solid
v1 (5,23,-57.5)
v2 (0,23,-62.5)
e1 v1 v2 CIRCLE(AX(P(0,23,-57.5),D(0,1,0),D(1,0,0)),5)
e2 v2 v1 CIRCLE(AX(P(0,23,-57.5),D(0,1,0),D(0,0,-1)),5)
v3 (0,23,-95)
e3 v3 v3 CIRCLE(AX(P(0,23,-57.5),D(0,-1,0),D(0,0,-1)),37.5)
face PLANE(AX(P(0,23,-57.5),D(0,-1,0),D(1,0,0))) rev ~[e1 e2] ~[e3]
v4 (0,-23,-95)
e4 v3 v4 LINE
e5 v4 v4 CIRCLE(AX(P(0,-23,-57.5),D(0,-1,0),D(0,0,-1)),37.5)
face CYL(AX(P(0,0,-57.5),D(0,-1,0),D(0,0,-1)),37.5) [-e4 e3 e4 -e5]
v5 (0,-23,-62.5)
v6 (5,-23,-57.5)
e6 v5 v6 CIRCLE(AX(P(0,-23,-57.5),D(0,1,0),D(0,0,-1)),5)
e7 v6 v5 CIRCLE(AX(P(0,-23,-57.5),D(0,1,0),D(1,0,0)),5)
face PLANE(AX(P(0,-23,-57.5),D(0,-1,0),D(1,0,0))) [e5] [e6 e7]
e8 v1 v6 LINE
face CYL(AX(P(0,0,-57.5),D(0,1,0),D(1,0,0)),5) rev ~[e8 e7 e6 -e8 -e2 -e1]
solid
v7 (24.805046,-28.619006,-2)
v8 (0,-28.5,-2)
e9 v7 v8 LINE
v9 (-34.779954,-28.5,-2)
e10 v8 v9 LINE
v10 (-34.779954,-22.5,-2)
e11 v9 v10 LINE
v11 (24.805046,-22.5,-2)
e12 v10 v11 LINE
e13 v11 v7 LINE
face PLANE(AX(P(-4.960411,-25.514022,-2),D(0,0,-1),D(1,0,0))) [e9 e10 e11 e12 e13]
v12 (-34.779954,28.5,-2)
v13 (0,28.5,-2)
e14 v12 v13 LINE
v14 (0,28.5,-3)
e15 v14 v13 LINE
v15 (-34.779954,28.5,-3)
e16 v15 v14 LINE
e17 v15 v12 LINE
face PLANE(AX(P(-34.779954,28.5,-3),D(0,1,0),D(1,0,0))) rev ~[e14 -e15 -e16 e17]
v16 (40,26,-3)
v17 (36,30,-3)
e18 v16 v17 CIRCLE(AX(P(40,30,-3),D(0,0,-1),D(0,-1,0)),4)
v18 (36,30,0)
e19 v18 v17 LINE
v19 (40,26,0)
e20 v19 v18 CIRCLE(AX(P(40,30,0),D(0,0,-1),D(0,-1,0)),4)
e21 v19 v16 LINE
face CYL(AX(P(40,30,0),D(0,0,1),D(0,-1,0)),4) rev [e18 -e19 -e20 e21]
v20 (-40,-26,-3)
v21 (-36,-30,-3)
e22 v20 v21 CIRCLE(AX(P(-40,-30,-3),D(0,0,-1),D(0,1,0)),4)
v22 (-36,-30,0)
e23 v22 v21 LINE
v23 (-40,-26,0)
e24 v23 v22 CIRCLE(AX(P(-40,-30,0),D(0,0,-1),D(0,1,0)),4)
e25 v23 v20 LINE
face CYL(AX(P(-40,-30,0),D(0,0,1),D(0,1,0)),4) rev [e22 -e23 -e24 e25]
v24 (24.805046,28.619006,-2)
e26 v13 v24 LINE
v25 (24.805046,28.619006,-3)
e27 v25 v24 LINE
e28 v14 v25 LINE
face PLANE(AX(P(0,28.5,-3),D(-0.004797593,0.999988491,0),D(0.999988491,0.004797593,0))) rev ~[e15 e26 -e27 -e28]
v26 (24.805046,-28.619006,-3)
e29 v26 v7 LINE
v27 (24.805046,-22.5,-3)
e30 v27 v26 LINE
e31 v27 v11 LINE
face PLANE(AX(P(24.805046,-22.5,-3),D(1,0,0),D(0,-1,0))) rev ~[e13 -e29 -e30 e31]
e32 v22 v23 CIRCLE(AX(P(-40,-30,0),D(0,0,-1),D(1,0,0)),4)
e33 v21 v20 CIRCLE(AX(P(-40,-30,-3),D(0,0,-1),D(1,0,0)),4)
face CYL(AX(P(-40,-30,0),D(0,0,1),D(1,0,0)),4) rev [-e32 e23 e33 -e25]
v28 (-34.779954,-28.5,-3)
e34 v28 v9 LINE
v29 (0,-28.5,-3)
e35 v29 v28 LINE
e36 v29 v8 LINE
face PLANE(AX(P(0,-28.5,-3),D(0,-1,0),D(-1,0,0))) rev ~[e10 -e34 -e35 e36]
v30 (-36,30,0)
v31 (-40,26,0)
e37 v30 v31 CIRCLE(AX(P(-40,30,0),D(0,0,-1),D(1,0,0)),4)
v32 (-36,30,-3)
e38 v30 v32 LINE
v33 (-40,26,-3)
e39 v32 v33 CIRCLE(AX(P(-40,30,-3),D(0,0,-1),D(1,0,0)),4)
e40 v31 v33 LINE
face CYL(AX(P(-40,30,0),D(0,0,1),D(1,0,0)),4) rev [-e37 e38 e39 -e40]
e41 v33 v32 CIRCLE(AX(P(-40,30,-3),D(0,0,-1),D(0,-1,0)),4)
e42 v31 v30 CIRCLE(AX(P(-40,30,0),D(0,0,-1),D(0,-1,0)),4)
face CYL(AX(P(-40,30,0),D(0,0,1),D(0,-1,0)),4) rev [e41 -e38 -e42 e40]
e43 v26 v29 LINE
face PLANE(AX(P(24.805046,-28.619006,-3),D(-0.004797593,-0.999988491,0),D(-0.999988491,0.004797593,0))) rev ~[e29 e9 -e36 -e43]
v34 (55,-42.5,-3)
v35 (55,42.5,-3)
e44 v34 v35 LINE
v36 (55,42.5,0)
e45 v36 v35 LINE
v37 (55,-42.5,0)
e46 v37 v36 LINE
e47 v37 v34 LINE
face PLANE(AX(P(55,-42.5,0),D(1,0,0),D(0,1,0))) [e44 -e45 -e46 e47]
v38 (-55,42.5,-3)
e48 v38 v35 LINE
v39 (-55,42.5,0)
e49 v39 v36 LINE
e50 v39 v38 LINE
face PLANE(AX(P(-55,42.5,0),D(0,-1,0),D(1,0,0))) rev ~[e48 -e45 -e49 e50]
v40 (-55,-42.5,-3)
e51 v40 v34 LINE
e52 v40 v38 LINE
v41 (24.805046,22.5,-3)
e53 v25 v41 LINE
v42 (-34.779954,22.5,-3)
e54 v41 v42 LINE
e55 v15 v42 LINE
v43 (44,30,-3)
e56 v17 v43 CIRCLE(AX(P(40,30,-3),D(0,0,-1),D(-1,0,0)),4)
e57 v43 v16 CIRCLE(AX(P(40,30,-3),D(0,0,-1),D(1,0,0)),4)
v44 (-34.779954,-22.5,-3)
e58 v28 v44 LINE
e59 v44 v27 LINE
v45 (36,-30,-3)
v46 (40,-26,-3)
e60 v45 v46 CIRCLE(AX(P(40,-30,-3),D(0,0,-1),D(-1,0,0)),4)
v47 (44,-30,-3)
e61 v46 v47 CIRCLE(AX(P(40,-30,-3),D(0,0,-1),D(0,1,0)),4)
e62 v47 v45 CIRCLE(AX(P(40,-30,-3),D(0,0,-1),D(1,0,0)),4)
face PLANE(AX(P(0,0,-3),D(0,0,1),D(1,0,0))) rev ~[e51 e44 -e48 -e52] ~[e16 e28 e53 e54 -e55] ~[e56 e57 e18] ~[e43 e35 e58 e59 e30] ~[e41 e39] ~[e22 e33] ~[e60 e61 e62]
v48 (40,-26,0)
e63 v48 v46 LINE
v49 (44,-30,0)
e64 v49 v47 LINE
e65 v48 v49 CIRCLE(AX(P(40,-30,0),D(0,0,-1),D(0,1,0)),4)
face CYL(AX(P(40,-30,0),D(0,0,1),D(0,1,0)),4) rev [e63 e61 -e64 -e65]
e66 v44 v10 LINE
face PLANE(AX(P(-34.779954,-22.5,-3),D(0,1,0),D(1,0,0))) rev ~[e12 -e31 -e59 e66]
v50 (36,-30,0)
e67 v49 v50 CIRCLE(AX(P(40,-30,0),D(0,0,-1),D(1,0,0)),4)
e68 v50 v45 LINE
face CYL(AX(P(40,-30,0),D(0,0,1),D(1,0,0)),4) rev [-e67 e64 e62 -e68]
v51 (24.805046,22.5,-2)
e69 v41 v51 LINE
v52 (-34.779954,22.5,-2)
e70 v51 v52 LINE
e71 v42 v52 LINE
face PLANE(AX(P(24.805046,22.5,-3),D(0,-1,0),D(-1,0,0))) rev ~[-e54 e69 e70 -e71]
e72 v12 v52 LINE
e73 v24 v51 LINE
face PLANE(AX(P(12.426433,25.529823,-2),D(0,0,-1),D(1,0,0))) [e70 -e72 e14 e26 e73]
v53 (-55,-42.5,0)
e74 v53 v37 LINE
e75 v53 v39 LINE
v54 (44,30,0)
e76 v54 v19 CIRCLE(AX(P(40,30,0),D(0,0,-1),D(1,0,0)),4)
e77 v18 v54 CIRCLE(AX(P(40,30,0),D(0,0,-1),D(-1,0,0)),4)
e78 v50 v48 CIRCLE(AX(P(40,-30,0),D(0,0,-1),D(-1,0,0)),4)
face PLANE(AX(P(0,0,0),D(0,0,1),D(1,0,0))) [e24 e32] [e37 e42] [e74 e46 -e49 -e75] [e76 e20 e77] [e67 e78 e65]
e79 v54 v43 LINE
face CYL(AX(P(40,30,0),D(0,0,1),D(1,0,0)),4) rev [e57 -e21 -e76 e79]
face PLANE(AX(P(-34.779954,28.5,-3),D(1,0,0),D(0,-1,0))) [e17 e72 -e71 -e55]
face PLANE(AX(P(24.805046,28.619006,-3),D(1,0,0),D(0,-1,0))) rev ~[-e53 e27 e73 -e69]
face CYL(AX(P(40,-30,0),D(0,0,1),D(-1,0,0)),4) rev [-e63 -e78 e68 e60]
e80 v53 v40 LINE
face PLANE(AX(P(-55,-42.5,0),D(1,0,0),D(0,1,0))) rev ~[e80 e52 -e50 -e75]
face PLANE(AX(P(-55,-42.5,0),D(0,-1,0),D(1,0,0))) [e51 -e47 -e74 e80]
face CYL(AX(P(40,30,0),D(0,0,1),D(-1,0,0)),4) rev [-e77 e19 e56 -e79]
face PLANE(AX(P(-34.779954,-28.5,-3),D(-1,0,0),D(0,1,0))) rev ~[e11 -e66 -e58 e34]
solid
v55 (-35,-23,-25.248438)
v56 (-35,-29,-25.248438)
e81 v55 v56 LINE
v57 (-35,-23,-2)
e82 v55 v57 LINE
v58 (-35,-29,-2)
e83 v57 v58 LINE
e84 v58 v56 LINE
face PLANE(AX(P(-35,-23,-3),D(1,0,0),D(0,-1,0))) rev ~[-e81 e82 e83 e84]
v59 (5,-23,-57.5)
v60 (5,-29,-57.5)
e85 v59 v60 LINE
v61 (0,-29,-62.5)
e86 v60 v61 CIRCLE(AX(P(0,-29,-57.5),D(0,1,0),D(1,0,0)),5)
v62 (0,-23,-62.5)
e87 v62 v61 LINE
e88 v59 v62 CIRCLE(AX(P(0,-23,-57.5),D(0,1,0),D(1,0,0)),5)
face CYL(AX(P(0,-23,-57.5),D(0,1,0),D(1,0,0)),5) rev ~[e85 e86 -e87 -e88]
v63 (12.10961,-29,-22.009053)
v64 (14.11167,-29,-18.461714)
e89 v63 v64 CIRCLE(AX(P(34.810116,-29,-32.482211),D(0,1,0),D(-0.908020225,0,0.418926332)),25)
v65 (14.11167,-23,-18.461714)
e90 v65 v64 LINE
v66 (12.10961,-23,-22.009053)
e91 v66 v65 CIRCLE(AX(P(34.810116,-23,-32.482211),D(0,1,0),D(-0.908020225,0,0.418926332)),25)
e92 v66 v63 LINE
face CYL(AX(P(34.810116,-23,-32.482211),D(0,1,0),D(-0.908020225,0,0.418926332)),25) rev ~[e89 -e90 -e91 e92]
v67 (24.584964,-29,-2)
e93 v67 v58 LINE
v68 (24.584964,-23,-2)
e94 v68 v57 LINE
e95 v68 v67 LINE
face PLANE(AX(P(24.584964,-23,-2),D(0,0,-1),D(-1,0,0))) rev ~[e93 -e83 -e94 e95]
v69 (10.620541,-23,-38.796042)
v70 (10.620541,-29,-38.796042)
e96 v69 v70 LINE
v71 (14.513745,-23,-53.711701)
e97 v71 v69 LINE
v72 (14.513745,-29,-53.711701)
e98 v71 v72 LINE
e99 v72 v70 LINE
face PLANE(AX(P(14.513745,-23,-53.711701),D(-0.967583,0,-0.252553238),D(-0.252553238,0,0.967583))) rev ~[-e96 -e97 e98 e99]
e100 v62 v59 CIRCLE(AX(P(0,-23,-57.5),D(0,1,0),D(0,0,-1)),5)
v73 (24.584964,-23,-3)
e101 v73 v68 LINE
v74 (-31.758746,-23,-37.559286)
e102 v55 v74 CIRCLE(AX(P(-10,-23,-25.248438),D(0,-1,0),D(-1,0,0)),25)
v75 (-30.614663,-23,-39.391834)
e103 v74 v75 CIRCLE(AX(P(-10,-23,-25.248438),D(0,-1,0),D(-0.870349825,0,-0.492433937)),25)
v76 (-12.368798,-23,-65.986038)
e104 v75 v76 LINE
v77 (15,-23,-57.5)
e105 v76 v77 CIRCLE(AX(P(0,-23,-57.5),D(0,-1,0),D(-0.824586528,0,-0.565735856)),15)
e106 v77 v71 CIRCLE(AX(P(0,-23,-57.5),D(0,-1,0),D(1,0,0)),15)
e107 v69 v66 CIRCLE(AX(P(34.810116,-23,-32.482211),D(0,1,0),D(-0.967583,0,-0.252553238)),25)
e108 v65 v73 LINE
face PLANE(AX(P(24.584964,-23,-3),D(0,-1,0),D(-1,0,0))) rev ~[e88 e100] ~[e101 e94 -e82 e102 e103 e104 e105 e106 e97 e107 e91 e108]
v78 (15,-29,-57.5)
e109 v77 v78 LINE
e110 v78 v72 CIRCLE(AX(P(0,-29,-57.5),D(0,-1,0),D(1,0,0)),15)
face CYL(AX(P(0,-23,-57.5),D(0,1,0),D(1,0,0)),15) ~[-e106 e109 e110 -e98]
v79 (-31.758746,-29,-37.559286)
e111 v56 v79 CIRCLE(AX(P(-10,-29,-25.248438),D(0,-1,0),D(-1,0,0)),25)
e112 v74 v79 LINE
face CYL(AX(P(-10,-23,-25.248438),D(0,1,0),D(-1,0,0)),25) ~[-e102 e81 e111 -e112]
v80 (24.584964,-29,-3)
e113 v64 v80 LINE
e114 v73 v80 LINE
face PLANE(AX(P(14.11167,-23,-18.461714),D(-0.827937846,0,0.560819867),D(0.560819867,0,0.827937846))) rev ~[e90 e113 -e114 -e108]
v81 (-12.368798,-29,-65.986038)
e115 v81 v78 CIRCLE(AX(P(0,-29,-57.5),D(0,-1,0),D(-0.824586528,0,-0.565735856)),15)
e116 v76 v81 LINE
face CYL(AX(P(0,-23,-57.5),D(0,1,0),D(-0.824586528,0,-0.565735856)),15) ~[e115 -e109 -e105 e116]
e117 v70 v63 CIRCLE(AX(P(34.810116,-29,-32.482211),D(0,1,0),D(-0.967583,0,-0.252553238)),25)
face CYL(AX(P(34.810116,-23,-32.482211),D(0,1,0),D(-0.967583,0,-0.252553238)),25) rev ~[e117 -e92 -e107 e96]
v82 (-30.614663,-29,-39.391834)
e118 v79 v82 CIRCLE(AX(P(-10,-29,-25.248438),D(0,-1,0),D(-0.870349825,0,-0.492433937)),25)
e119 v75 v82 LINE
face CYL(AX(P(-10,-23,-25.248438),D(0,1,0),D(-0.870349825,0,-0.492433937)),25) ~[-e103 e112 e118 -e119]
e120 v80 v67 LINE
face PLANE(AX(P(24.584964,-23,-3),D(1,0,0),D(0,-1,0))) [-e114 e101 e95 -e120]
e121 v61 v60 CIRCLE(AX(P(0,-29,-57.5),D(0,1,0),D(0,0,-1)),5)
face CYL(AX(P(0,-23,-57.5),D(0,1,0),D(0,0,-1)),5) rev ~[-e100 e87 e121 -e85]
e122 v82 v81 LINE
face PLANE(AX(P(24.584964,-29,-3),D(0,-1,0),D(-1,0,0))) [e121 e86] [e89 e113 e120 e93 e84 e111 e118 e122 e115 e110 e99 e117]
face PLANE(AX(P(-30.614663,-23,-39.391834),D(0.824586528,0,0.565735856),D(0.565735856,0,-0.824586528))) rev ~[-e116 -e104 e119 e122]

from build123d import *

# Parameters (mm, degrees)
F1_DEPTH = 23
F2_W     = 110
F2_H     = 85
F3_DEPTH = 3
F5_DEPTH = 6
F6_W     = 34.7799539885
F6_H     = 6
F7_DEPTH = 1
F8_DEPTH = 1


with BuildPart() as f1:
    # F0 (on Front) → F1 (new body, symmetric)
    with BuildSketch(Plane.XZ):
        with BuildLine():
            ThreePointArc((37.5, -57.5), (-26.5165042945, -30.9834957055), (0, -95))
            ThreePointArc((0, -95), (26.5165042945, -84.0165042945), (37.5, -57.5))
        make_face()
        with BuildLine():
            ThreePointArc((5, -57.5), (3.5355339059, -61.0355339059), (0, -62.5))
            ThreePointArc((0, -62.5), (-3.5355339059, -53.9644660941), (5, -57.5))
        make_face(mode=Mode.SUBTRACT)
    extrude(amount=F1_DEPTH, both=True)


with BuildPart() as f3:
    # F2 (on Top) → F3 (new body)
    with BuildSketch(Plane.XY):
        Rectangle(F2_W, F2_H)
        with BuildLine():
            Line((36, -30), (-36, -30))
            ThreePointArc((-36, -30), (-42.8284271247, -32.8284271247), (-40, -26))
            Line((-40, -26), (-40, 26))
            ThreePointArc((-40, 26), (-42.8284271247, 32.8284271247), (-36, 30))
            Line((-36, 30), (36, 30))
            ThreePointArc((36, 30), (40, 34), (44, 30))
            ThreePointArc((44, 30), (42.8284271247, 27.1715728753), (40, 26))
            Line((40, 26), (40, -26))
            ThreePointArc((40, -26), (42.8284271247, -27.1715728753), (44, -30))
            ThreePointArc((44, -30), (40, -34), (36, -30))
        make_face(mode=Mode.SUBTRACT)
        with BuildLine():
            ThreePointArc((-40, -26), (-37.1715728753, -27.1715728753), (-36, -30))
            Line((-36, -30), (36, -30))
            ThreePointArc((36, -30), (37.1715728753, -27.1715728753), (40, -26))
            Line((40, -26), (40, 26))
            ThreePointArc((40, 26), (37.1715728753, 27.1715728753), (36, 30))
            Line((36, 30), (-36, 30))
            ThreePointArc((-36, 30), (-37.1715728753, 27.1715728753), (-40, 26))
            Line((-40, 26), (-40, -26))
        make_face()
    extrude(amount=-F3_DEPTH)

    # F6 (on face) → F7 (cut)
    with BuildSketch(Plane(origin=(0, 0, -3), x_dir=(1, 0, 0), z_dir=(0, 0, -1))):
        Polygon((24.8050460115, -22.5), (0, -22.5), (0, -28.5), (24.8050460115, -28.6190058787), align=None)
        with Locations((-17.3899769943, -25.5)):
            Rectangle(F6_W, F6_H)
        Polygon((0, 22.5), (24.8050460115, 22.5), (24.8050460115, 28.6190058787), (0, 28.5), (-34.7799539885, 28.5), (-34.7799539885, 22.5), align=None)
    extrude(amount=-F7_DEPTH, mode=Mode.SUBTRACT)


with BuildPart() as f5:
    # F4 (on face) → F5 (new body)
    with BuildSketch(Plane.XZ.offset(23)):
        with BuildLine():
            ThreePointArc((-31.7587456306, -37.5592859714), (-12.5289492083, -22.1549093687), (12.1096103032, -22.0090527274))
            ThreePointArc((12.1096103032, -22.0090527274), (13.0382727302, -20.194540616), (14.1116697761, -18.4617143444))
            Line((14.1116697761, -18.4617143444), (24.5849639177, -3))
            Line((24.5849639177, -3), (0, -3))
            Line((0, -3), (-35, -3))
            Line((-35, -3), (-35, -25.248437561))
            ThreePointArc((-35, -25.248437561), (-34.1761105305, -31.6136303796), (-31.7587456306, -37.5592859714))
        make_face()
        with BuildLine():
            ThreePointArc((-12.3687979141, -65.9860378364), (-6.2301711882, -43.8550387701), (14.5137450016, -53.7117014336))
            Line((14.5137450016, -53.7117014336), (10.6205409153, -38.7960419739))
            ThreePointArc((10.6205409153, -38.7960419739), (9.9078937869, -30.273289816), (12.1096103032, -22.0090527274))
            ThreePointArc((12.1096103032, -22.0090527274), (-12.5289492083, -22.1549093687), (-31.7587456306, -37.5592859714))
            ThreePointArc((-31.7587456306, -37.5592859714), (-31.2065084773, -38.4879238879), (-30.6146631901, -39.3918339551))
            Line((-30.6146631901, -39.3918339551), (-12.3687979141, -65.9860378364))
        make_face()
        with BuildLine():
            ThreePointArc((-12.3687979141, -65.9860378364), (4.4422984641, -71.8271066289), (15, -57.5))
            ThreePointArc((15, -57.5), (14.8779396259, -55.5903108924), (14.5137450016, -53.7117014336))
            ThreePointArc((14.5137450016, -53.7117014336), (-6.2301711882, -43.8550387701), (-12.3687979141, -65.9860378364))
        make_face()
        with BuildLine():
            ThreePointArc((0, -62.5), (-3.5355339059, -53.9644660941), (5, -57.5))
            ThreePointArc((5, -57.5), (3.5355339059, -61.0355339059), (0, -62.5))
        make_face(mode=Mode.SUBTRACT)
    extrude(amount=F5_DEPTH)

    # F8 (add): a face of the model
    f8_faces = [f5.faces().sort_by_distance(p)[0] for p in [
        (-5.2075180411, -26, -3),
    ]]
    extrude(f8_faces, amount=F8_DEPTH)


solid = Compound([f1.part, f3.part, f5.part])
